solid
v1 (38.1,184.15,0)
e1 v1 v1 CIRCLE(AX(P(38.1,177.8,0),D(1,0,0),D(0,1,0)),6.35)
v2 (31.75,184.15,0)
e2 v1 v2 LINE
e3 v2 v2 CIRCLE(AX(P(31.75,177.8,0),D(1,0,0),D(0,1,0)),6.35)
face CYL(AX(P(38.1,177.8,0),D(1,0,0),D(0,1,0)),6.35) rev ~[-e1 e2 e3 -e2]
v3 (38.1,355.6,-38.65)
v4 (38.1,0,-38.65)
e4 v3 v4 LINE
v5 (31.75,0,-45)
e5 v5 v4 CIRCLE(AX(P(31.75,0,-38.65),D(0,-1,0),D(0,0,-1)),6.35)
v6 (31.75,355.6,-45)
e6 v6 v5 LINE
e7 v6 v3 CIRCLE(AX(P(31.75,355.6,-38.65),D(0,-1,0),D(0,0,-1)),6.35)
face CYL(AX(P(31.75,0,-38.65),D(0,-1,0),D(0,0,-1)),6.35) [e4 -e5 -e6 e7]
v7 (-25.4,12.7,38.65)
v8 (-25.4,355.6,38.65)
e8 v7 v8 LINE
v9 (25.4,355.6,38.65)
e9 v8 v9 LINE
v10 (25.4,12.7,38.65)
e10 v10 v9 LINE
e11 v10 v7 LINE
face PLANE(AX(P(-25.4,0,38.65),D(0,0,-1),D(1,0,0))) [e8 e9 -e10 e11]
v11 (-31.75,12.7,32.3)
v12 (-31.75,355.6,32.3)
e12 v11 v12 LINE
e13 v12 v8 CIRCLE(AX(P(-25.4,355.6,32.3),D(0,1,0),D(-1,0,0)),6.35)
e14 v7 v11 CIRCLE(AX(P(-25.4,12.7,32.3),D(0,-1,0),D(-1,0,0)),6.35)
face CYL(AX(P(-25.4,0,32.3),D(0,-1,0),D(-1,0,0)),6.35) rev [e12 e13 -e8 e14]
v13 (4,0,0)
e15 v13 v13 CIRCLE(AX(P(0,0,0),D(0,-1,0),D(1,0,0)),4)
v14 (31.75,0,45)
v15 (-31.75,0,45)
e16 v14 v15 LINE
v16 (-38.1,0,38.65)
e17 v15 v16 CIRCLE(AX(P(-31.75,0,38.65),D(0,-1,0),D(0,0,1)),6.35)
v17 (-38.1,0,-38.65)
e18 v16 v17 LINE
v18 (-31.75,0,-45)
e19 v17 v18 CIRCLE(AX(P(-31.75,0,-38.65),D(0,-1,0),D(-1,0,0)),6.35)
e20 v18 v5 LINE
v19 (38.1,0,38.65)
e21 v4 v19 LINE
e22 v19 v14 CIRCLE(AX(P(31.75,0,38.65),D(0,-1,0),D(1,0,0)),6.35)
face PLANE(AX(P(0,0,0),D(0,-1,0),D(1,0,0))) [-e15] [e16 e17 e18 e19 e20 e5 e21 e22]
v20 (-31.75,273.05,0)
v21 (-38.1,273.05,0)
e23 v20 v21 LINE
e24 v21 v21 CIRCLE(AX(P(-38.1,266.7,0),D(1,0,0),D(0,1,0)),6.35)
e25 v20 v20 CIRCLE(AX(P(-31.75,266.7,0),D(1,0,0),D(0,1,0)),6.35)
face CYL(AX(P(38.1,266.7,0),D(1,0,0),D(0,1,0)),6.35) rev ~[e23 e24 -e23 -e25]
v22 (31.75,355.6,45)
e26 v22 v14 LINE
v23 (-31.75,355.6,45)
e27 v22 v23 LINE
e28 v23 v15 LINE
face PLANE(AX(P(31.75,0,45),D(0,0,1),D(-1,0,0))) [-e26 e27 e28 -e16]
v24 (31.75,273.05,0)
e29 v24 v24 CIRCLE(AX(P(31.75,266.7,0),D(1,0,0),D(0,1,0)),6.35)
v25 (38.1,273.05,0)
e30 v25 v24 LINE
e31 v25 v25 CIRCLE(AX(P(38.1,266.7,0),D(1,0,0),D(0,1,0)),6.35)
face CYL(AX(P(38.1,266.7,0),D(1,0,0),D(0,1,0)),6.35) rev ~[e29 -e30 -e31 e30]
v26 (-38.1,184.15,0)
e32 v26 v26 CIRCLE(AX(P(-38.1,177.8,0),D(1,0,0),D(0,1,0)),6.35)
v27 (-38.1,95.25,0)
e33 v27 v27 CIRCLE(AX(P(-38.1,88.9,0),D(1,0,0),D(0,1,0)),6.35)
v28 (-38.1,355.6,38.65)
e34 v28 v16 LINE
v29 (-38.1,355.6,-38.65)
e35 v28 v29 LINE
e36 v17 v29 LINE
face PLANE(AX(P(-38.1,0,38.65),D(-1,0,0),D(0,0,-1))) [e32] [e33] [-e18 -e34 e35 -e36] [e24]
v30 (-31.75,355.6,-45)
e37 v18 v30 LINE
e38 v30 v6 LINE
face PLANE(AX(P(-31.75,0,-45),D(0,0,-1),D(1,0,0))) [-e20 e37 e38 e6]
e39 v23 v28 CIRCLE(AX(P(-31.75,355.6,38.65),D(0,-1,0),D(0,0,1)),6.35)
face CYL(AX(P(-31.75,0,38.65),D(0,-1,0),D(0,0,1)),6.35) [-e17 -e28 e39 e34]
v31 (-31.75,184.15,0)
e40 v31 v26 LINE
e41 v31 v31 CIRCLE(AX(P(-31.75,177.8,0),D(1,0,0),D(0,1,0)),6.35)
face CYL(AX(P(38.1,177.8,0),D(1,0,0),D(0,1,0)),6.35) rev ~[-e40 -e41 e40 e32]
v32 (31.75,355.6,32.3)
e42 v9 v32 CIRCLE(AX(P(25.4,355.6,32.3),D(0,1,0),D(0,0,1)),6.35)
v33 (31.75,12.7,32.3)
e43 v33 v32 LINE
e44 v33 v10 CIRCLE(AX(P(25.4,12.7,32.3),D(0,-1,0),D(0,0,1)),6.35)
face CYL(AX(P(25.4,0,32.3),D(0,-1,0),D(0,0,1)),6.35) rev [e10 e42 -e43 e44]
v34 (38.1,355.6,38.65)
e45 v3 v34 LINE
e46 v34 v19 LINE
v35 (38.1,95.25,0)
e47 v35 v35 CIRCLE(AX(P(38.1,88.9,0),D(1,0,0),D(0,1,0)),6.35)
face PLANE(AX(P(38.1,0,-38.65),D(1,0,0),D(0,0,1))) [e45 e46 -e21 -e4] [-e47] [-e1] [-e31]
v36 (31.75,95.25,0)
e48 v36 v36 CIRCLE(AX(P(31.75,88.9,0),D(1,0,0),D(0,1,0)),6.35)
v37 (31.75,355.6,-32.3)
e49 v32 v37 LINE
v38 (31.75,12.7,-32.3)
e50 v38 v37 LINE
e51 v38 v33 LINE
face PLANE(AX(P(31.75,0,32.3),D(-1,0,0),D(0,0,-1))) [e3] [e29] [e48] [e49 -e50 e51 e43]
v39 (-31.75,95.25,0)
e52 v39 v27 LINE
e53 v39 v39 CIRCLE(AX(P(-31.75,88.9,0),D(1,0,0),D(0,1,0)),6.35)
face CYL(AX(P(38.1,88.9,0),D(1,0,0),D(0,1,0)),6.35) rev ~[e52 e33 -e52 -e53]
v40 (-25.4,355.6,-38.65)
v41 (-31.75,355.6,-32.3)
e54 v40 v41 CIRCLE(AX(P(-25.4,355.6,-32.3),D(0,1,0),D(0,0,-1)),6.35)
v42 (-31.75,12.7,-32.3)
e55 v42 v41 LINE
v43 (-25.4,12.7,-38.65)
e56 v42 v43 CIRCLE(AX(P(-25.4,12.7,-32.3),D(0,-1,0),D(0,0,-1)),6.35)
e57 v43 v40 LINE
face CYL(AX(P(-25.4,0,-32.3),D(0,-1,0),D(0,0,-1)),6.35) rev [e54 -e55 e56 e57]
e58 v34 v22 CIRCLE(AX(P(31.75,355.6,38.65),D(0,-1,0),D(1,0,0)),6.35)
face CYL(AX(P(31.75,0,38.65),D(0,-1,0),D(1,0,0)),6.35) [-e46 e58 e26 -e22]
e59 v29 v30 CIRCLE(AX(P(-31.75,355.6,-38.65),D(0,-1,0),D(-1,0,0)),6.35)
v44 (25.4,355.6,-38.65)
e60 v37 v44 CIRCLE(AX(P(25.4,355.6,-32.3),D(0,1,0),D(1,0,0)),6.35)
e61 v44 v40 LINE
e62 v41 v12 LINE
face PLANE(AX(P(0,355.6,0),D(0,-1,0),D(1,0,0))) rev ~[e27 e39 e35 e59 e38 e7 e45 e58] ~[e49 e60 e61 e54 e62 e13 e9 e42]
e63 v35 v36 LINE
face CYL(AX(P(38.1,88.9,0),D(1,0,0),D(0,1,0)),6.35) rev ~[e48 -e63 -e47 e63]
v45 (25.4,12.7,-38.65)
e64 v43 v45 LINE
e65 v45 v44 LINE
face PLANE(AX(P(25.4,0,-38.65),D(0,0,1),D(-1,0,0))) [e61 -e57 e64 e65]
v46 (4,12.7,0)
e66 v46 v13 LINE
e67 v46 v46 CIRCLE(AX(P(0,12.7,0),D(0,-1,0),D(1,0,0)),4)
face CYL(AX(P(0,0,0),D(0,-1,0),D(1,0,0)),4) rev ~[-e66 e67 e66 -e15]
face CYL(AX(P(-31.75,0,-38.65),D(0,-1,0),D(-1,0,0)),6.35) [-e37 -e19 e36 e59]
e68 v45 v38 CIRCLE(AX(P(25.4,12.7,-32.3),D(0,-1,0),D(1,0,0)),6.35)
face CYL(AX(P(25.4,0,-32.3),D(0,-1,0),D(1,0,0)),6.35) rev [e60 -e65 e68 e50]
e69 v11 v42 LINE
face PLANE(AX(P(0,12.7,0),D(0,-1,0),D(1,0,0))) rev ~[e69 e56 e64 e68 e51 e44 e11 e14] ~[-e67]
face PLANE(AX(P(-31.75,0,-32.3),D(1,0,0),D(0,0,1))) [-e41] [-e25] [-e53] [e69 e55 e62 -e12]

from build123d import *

# Parameters (mm, degrees)
F0_R     = 4
F1_DEPTH = 6.35
F2_DEPTH = 355.6
F4_DEPTH = 12.7
F5_R     = 6.35
F6_DEPTH = 76.201


# Not quite as in the source:
# - a feature names something its author has since deleted; it is built from what else it names


with BuildPart() as f1:
    # F0 (on Front) → F1 (new body)
    with BuildSketch(Plane.XZ):
        with BuildLine():
            Line((-25.4, -38.65), (25.4, -38.65))
            ThreePointArc((25.4, -38.65), (29.8901280605, -36.7901280605), (31.75, -32.3))
            Line((31.75, -32.3), (31.75, 32.3))
            ThreePointArc((31.75, 32.3), (29.8901280605, 36.7901280605), (25.4, 38.65))
            Line((25.4, 38.65), (-25.4, 38.65))
            ThreePointArc((-25.4, 38.65), (-29.8901280605, 36.7901280605), (-31.75, 32.3))
            Line((-31.75, 32.3), (-31.75, -32.3))
            ThreePointArc((-31.75, -32.3), (-29.8901280605, -36.7901280605), (-25.4, -38.65))
        make_face()
        Circle(F0_R, mode=Mode.SUBTRACT)
    extrude(amount=-F1_DEPTH)

    # F0 (on Front) → F2 (join)
    with BuildSketch(Plane.XZ):
        with BuildLine():
            Line((-31.75, -45), (31.75, -45))
            ThreePointArc((31.75, -45), (36.2401280605, -43.1401280605), (38.1, -38.65))
            Line((38.1, -38.65), (38.1, 38.65))
            ThreePointArc((38.1, 38.65), (36.2401280605, 43.1401280605), (31.75, 45))
            Line((31.75, 45), (-31.75, 45))
            ThreePointArc((-31.75, 45), (-36.2401280605, 43.1401280605), (-38.1, 38.65))
            Line((-38.1, 38.65), (-38.1, -38.65))
            ThreePointArc((-38.1, -38.65), (-36.2401280605, -43.1401280605), (-31.75, -45))
        make_face()
        with BuildLine():
            ThreePointArc((31.75, -32.3), (29.8901280605, -36.7901280605), (25.4, -38.65))
            Line((25.4, -38.65), (-25.4, -38.65))
            ThreePointArc((-25.4, -38.65), (-29.8901280605, -36.7901280605), (-31.75, -32.3))
            Line((-31.75, -32.3), (-31.75, 32.3))
            ThreePointArc((-31.75, 32.3), (-29.8901280605, 36.7901280605), (-25.4, 38.65))
            Line((-25.4, 38.65), (25.4, 38.65))
            ThreePointArc((25.4, 38.65), (29.8901280605, 36.7901280605), (31.75, 32.3))
            Line((31.75, 32.3), (31.75, -32.3))
        make_face(mode=Mode.SUBTRACT)
    extrude(amount=-F2_DEPTH)

    # F0 (on Front) → F4 (join)
    with BuildSketch(Plane.XZ):
        with BuildLine():
            Line((-31.75, -45), (31.75, -45))
            ThreePointArc((31.75, -45), (36.2401280605, -43.1401280605), (38.1, -38.65))
            Line((38.1, -38.65), (38.1, 38.65))
            ThreePointArc((38.1, 38.65), (36.2401280605, 43.1401280605), (31.75, 45))
            Line((31.75, 45), (-31.75, 45))
            ThreePointArc((-31.75, 45), (-36.2401280605, 43.1401280605), (-38.1, 38.65))
            Line((-38.1, 38.65), (-38.1, -38.65))
            ThreePointArc((-38.1, -38.65), (-36.2401280605, -43.1401280605), (-31.75, -45))
        make_face()
        with BuildLine():
            ThreePointArc((31.75, -32.3), (29.8901280605, -36.7901280605), (25.4, -38.65))
            Line((25.4, -38.65), (-25.4, -38.65))
            ThreePointArc((-25.4, -38.65), (-29.8901280605, -36.7901280605), (-31.75, -32.3))
            Line((-31.75, -32.3), (-31.75, 32.3))
            ThreePointArc((-31.75, 32.3), (-29.8901280605, 36.7901280605), (-25.4, 38.65))
            Line((-25.4, 38.65), (25.4, 38.65))
            ThreePointArc((25.4, 38.65), (29.8901280605, 36.7901280605), (31.75, 32.3))
            Line((31.75, 32.3), (31.75, -32.3))
        make_face(mode=Mode.SUBTRACT)
        with BuildLine():
            Line((-25.4, -38.65), (25.4, -38.65))
            ThreePointArc((25.4, -38.65), (29.8901280605, -36.7901280605), (31.75, -32.3))
            Line((31.75, -32.3), (31.75, 32.3))
            ThreePointArc((31.75, 32.3), (29.8901280605, 36.7901280605), (25.4, 38.65))
            Line((25.4, 38.65), (-25.4, 38.65))
            ThreePointArc((-25.4, 38.65), (-29.8901280605, 36.7901280605), (-31.75, 32.3))
            Line((-31.75, 32.3), (-31.75, -32.3))
            ThreePointArc((-31.75, -32.3), (-29.8901280605, -36.7901280605), (-25.4, -38.65))
        make_face()
        Circle(F0_R, mode=Mode.SUBTRACT)
    extrude(amount=-F4_DEPTH)

    # F5 (on face) → F6 (cut, through all)
    with BuildSketch(Plane.YZ.offset(38.1)):
        with Locations((88.9, 0)):
            Circle(F5_R)
        with Locations((177.8, 0)):
            Circle(F5_R)
        with Locations((266.7, 0)):
            Circle(F5_R)
    extrude(amount=-F6_DEPTH, mode=Mode.SUBTRACT)


solid = f1.part
